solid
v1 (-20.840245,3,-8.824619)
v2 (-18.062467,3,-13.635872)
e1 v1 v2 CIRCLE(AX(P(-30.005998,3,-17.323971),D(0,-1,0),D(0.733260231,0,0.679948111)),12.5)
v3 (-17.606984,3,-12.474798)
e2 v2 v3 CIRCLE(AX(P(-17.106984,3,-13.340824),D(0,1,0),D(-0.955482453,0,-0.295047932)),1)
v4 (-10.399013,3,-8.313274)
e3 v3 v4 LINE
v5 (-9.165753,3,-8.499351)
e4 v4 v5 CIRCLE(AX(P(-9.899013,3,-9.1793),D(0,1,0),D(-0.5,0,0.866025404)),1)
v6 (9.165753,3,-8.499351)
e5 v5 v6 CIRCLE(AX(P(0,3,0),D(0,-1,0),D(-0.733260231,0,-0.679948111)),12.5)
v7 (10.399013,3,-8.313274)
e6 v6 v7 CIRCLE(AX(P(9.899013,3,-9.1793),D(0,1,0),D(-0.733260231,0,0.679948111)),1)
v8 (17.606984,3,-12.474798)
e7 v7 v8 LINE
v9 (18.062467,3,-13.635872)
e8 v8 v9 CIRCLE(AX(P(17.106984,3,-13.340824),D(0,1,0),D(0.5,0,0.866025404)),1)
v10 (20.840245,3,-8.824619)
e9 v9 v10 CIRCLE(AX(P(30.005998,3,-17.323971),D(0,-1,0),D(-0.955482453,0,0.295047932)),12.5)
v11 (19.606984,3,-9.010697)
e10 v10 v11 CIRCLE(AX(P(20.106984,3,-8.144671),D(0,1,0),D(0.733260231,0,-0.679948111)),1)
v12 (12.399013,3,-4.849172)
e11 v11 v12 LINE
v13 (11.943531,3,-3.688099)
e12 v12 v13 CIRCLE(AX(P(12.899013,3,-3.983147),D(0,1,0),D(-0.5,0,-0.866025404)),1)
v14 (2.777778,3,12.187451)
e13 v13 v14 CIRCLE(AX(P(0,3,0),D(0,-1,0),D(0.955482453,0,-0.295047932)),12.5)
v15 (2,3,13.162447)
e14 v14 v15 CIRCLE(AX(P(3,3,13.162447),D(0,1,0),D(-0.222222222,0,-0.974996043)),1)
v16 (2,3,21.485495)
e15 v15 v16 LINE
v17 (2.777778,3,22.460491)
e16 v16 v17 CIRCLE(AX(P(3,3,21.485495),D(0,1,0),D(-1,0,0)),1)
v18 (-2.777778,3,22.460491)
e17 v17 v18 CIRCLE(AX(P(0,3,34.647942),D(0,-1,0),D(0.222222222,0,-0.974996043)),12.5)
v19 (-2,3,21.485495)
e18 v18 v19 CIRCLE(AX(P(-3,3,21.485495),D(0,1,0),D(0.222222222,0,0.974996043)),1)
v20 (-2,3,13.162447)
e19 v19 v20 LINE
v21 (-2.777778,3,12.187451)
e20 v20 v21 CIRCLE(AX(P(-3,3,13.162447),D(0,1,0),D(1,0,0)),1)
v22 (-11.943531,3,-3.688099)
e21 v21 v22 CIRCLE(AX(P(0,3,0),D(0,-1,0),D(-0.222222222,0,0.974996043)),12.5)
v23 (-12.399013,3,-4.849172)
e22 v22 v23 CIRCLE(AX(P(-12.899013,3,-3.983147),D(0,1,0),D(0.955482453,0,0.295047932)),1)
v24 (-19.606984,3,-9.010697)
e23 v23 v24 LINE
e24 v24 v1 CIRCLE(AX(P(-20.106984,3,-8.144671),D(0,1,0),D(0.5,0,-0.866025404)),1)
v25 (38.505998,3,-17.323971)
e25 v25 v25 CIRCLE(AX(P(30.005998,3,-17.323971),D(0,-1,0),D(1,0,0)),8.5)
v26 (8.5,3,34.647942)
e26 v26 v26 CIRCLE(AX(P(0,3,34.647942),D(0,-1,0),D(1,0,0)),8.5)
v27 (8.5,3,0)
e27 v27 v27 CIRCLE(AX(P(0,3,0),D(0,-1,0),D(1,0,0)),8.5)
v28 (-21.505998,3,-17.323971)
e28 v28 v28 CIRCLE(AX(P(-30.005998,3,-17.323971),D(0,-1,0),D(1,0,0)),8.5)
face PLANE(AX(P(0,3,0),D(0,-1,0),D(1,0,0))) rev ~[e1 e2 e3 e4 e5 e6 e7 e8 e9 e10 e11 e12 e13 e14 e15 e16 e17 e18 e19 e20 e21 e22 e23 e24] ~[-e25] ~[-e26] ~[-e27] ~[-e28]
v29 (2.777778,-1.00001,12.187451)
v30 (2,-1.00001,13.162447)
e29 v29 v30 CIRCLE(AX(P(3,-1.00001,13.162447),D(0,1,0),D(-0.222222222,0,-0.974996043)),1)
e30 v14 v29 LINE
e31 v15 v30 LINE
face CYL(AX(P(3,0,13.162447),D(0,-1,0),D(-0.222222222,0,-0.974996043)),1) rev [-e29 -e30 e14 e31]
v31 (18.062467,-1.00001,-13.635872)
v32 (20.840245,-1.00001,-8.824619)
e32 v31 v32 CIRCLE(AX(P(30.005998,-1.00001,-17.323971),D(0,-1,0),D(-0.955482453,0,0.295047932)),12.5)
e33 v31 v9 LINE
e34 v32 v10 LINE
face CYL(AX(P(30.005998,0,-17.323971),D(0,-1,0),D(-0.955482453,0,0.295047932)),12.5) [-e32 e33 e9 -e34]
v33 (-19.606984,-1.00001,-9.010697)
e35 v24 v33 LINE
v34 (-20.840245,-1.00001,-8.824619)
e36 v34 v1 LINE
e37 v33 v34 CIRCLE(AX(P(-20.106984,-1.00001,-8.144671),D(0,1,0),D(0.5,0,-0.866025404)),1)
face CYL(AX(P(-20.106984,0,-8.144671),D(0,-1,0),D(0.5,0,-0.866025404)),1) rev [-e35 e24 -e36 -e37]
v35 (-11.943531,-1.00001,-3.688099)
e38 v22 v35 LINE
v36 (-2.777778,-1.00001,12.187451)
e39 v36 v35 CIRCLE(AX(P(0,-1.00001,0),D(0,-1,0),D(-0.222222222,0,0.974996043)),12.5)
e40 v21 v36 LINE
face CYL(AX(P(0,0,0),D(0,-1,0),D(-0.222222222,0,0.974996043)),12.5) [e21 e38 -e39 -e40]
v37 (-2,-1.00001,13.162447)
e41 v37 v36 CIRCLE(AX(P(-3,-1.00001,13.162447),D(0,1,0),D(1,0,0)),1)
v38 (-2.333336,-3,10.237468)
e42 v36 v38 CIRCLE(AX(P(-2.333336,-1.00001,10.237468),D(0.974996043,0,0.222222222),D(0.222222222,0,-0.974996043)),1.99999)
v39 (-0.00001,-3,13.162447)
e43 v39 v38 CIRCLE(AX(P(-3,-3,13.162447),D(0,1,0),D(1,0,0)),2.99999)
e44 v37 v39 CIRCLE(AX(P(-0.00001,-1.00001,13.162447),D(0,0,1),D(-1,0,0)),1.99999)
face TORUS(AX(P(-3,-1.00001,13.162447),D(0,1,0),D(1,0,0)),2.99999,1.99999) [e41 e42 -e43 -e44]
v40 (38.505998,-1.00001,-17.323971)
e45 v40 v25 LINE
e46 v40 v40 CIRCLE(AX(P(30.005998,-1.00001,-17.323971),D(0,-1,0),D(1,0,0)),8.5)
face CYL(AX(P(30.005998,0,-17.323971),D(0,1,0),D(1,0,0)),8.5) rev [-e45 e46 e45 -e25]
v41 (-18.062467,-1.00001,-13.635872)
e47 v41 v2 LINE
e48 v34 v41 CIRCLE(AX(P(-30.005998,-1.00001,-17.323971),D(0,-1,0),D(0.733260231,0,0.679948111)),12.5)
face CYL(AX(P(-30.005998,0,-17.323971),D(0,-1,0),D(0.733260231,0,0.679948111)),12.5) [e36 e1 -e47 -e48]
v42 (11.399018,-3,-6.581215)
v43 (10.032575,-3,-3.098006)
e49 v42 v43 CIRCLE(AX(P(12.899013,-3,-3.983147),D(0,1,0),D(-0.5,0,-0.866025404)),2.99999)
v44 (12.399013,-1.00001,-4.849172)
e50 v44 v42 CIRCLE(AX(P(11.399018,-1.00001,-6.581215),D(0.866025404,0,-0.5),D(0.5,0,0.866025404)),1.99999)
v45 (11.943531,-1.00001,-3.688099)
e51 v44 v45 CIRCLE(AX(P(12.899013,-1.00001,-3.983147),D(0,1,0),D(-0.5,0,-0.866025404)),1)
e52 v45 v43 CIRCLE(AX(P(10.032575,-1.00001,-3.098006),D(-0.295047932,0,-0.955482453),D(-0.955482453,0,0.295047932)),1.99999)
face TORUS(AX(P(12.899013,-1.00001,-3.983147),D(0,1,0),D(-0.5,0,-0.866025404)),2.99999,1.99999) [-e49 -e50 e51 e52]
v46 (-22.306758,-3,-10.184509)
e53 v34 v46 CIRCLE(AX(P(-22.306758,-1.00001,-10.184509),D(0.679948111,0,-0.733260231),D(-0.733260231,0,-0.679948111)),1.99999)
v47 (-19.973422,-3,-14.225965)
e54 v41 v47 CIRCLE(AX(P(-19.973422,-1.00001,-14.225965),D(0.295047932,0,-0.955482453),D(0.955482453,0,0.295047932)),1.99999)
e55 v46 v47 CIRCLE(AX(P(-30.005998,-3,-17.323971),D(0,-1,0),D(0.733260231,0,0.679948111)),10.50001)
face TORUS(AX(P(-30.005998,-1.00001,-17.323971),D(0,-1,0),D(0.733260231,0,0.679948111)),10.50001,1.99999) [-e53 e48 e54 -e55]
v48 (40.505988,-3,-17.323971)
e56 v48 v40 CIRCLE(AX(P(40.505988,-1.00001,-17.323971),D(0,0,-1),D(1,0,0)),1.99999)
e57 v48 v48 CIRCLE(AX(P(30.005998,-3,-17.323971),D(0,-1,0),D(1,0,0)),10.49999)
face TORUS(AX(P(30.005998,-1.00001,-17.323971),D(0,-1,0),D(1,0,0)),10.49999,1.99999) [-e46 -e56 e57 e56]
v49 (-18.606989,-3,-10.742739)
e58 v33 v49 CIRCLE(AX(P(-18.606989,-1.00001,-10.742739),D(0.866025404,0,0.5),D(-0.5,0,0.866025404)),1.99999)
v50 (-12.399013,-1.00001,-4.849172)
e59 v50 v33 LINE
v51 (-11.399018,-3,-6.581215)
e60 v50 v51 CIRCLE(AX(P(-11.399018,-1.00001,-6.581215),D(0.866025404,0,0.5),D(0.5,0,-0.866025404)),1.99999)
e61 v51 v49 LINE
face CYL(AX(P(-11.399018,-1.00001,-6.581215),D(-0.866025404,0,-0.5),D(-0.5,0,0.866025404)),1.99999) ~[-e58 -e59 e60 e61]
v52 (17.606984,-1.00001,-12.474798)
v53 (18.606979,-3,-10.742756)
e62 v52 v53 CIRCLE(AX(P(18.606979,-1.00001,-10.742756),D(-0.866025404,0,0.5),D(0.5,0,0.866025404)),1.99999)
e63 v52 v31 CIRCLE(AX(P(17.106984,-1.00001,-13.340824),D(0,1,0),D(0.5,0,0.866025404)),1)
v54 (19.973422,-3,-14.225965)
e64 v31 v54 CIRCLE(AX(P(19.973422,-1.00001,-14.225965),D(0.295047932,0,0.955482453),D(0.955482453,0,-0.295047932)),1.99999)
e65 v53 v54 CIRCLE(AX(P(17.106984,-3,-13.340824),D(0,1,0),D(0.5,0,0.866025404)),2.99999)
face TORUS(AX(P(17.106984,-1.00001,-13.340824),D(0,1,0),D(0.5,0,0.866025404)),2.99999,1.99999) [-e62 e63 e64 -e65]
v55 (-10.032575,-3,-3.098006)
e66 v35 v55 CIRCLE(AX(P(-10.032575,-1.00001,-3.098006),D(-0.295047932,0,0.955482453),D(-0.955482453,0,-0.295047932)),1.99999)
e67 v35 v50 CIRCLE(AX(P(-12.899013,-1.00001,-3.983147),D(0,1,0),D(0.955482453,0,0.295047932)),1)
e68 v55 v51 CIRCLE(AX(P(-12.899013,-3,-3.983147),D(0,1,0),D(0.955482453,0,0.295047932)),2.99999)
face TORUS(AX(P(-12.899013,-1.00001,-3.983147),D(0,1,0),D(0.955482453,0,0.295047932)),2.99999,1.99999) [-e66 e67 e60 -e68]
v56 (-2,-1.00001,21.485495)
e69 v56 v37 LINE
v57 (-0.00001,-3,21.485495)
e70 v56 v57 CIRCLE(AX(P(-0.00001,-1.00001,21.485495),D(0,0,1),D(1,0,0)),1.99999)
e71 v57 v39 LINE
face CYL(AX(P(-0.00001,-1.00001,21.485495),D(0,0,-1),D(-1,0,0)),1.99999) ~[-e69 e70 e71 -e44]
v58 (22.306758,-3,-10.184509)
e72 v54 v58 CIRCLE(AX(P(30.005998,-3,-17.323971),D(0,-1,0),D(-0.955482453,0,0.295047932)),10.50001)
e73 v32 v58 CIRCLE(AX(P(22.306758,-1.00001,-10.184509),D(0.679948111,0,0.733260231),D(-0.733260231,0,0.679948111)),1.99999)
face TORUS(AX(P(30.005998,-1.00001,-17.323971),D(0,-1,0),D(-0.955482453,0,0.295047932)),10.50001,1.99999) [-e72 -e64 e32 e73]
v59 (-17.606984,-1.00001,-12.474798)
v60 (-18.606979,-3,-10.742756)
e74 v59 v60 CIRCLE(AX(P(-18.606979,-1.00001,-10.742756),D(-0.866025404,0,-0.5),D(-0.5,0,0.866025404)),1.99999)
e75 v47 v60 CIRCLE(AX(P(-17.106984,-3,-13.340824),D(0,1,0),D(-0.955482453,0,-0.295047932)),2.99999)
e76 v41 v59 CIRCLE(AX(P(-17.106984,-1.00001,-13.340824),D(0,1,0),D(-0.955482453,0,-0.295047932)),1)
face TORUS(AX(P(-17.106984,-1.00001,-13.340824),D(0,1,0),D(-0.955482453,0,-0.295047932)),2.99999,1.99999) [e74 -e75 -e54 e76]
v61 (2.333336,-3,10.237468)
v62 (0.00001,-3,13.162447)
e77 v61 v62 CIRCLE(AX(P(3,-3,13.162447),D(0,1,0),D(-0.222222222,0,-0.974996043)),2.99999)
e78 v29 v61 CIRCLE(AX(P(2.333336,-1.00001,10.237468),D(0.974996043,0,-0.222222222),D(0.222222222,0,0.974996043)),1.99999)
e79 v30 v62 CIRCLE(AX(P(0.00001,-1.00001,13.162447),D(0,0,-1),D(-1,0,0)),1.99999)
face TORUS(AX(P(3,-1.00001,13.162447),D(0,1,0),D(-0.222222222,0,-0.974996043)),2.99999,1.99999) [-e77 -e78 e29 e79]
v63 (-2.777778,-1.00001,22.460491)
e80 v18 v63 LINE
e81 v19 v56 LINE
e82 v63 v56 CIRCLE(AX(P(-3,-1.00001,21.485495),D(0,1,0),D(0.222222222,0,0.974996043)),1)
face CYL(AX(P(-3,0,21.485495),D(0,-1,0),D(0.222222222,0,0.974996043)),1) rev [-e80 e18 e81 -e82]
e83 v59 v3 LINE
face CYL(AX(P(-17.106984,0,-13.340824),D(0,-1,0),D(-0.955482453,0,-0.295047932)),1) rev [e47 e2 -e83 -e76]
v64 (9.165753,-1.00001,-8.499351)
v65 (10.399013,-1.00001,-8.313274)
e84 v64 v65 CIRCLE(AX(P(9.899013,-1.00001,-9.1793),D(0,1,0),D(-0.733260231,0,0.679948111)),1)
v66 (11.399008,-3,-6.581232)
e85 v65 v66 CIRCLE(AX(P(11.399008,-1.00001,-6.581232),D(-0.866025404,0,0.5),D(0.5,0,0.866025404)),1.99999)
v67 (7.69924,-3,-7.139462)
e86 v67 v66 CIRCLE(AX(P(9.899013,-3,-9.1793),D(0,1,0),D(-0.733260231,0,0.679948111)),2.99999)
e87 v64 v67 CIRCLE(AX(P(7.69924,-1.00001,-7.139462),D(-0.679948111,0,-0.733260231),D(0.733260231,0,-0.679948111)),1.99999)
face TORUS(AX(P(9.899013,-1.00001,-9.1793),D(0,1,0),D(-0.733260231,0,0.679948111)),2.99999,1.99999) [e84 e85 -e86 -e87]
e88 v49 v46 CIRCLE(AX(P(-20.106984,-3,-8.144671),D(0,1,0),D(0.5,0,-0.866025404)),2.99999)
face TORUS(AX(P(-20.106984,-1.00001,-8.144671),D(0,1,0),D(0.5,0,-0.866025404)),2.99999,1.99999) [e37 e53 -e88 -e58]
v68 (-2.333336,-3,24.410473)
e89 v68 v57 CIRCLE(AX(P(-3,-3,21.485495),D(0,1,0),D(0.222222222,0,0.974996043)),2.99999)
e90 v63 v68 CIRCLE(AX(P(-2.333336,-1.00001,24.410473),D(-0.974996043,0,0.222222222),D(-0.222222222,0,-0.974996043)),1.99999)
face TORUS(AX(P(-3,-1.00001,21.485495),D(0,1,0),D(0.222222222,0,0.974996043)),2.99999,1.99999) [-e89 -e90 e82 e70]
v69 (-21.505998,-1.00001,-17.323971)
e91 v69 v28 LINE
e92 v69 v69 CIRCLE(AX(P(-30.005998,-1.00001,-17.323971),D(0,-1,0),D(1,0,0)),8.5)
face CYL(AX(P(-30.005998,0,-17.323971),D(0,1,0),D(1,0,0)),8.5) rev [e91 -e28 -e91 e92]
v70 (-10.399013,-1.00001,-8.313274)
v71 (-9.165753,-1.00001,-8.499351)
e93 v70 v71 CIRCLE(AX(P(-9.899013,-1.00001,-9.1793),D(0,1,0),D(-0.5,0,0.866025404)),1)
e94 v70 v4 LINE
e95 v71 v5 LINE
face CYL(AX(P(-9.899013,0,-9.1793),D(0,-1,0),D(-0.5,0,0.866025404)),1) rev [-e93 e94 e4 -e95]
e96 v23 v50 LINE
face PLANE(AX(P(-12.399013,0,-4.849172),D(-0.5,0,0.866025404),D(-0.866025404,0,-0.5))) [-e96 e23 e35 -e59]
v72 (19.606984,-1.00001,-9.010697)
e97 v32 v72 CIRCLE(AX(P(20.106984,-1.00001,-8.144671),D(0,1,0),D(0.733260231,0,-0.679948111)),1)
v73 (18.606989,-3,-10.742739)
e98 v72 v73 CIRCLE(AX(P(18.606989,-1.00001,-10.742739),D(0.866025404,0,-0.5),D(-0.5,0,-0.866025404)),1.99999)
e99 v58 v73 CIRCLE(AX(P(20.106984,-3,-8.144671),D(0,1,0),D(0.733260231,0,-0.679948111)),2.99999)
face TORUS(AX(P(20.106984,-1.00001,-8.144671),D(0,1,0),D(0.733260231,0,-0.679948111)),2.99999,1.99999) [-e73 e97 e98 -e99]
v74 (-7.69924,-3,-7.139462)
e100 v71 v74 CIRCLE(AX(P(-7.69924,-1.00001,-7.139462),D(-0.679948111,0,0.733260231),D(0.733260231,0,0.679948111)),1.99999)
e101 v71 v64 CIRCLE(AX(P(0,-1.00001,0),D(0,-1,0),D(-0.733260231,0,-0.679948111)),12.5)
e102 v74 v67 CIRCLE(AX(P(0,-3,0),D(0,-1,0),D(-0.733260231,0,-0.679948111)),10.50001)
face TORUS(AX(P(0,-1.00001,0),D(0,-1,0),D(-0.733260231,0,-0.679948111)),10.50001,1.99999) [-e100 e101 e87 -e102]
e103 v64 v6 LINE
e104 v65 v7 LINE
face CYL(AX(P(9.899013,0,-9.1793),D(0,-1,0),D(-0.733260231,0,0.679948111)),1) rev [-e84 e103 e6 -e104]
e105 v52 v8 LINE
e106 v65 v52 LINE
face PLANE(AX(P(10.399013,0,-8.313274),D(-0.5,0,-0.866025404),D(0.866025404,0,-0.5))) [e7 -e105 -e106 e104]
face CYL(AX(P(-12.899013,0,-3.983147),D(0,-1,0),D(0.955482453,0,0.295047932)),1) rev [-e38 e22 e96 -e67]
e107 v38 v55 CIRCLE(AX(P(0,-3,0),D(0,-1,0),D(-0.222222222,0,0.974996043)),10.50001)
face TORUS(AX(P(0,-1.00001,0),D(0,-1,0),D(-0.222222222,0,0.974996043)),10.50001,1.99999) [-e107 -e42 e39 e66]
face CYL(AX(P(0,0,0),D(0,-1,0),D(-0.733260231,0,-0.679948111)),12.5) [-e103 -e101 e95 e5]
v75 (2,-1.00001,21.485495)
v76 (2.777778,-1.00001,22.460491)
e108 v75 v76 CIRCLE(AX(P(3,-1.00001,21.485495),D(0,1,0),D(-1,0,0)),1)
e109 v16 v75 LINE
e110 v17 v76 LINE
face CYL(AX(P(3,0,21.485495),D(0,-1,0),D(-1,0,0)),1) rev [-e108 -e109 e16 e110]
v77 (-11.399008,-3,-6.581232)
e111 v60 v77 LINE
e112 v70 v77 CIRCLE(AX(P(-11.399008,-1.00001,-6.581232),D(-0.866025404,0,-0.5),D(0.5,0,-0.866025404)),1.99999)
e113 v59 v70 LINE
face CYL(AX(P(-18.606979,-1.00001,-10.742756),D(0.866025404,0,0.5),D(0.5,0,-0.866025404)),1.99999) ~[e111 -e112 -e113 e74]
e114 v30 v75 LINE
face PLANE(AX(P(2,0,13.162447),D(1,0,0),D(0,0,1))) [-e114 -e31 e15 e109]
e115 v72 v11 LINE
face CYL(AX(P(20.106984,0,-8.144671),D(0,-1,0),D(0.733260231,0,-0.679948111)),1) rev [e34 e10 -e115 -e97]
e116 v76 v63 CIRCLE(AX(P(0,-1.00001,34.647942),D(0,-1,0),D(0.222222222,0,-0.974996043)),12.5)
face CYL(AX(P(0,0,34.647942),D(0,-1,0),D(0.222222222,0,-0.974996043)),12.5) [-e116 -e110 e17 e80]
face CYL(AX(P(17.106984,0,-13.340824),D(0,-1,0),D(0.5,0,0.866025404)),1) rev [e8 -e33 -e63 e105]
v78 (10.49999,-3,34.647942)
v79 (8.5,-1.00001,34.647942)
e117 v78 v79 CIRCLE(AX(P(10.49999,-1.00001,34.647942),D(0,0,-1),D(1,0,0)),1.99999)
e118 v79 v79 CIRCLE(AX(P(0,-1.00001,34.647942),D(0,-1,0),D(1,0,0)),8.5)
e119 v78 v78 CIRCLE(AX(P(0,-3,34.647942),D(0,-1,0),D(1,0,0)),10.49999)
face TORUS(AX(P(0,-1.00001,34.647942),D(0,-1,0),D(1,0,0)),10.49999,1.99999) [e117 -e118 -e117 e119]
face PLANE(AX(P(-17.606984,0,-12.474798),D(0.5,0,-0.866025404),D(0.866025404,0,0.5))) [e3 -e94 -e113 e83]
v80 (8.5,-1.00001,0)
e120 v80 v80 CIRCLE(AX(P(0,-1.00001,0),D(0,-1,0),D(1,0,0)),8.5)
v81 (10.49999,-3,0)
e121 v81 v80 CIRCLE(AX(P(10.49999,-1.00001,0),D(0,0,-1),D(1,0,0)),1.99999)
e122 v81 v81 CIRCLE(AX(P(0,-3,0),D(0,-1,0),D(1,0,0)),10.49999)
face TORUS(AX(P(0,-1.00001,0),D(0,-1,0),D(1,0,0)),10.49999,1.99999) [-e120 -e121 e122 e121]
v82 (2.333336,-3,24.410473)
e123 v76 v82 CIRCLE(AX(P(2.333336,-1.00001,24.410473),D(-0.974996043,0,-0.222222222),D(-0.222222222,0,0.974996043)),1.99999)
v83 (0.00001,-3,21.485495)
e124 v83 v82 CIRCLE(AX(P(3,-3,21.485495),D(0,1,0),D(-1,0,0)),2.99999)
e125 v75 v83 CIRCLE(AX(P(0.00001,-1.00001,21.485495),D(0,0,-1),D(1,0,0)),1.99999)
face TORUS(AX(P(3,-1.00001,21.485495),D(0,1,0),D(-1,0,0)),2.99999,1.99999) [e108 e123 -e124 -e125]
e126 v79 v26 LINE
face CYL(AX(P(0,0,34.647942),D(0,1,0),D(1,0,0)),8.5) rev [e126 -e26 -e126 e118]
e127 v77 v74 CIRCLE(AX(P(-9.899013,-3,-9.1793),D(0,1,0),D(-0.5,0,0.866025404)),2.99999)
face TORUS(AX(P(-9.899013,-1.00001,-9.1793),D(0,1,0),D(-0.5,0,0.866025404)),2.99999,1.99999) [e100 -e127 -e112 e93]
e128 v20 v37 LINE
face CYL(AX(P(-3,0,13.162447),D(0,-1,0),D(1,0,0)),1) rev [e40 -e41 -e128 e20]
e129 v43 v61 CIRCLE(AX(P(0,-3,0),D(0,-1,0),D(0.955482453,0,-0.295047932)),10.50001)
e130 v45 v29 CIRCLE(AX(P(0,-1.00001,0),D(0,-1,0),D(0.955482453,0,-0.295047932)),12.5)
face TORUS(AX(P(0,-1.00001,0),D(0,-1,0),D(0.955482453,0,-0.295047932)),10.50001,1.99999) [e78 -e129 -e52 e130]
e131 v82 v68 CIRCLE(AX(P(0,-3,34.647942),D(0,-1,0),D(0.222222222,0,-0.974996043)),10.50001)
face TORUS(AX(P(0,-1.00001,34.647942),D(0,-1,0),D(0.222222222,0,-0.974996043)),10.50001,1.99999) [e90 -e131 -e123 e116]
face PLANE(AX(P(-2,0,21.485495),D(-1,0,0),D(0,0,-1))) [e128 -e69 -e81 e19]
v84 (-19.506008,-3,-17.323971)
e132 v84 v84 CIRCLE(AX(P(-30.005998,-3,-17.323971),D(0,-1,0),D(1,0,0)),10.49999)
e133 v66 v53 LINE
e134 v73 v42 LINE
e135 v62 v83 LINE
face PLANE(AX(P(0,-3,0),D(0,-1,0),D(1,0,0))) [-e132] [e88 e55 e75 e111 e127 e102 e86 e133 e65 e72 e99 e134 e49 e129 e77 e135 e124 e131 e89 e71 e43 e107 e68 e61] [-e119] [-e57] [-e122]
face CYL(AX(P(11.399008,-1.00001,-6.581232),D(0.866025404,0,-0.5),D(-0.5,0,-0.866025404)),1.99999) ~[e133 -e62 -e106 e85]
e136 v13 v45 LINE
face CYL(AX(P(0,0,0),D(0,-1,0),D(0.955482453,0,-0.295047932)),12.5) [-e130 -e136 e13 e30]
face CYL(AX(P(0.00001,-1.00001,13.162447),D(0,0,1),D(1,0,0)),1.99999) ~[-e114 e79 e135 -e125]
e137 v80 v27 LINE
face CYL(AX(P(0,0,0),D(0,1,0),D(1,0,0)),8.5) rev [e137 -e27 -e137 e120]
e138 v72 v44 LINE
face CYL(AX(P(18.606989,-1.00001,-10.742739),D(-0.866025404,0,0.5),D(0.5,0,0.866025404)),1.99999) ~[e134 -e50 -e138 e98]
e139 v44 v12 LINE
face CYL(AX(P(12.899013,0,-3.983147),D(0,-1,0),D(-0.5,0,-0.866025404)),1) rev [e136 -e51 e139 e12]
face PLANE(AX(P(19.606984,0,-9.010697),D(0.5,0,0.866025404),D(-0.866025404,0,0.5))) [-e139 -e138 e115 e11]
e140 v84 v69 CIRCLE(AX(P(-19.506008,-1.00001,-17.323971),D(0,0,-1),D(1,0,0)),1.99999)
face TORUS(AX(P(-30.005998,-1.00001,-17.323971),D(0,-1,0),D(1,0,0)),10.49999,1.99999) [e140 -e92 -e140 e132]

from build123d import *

# Parameters (mm, degrees)
F0_R     = 8.5
F1_DEPTH = 3
F2_R     = 1.99999


# Not quite as in the source:
# - a fillet or chamfer is up to 0.001 mm smaller than in the source, because OpenCascade refuses the exact size


with BuildPart() as f1:
    # F0 (on Front) → F1 (new body, symmetric)
    with BuildSketch(Plane.XZ):
        with BuildLine():
            ThreePointArc((12.3990131152, -4.849172483), (11.9680834103, -4.3483454973), (11.9435306622, -3.6880991474))
            ThreePointArc((11.9435306622, -3.6880991474), (10.8253175473, 6.25), (2.7777777778, 12.187450538))
            ThreePointArc((2.7777777778, 12.187450538), (2.21826404, 12.5388370166), (2, 13.1624465811))
            Line((2, 13.1624465811), (2, 21.4854950083))
            ThreePointArc((2, 21.4854950083), (2.21826404, 22.1091045727), (2.7777777778, 22.4604910513))
            ThreePointArc((2.7777777778, 22.4604910513), (0, 47.1479415894), (-2.7777777778, 22.4604910513))
            ThreePointArc((-2.7777777778, 22.4604910513), (-2.21826404, 22.1091045727), (-2, 21.4854950083))
            Line((-2, 21.4854950083), (-2, 13.1624465811))
            ThreePointArc((-2, 13.1624465811), (-2.21826404, 12.5388370166), (-2.7777777778, 12.187450538))
            ThreePointArc((-2.7777777778, 12.187450538), (-10.8253175473, 6.25), (-11.9435306622, -3.6880991474))
            ThreePointArc((-11.9435306622, -3.6880991474), (-11.9680834103, -4.3483454973), (-12.3990131152, -4.849172483))
            Line((-12.3990131152, -4.849172483), (-19.60698449, -9.0106966966))
            ThreePointArc((-19.60698449, -9.0106966966), (-20.2561782349, -9.1334792754), (-20.8402447208, -8.824619404))
            ThreePointArc((-20.8402447208, -8.824619404), (-40.8313151525, -23.5739707947), (-18.062466943, -13.6358716473))
            ThreePointArc((-18.062466943, -13.6358716473), (-18.0379141949, -12.9756252973), (-17.60698449, -12.4747983117))
            Line((-17.60698449, -12.4747983117), (-10.3990131152, -8.3132740981))
            ThreePointArc((-10.3990131152, -8.3132740981), (-9.7498193703, -8.1904915193), (-9.1657528844, -8.4993513906))
            ThreePointArc((-9.1657528844, -8.4993513906), (0, -12.5), (9.1657528844, -8.4993513906))
            ThreePointArc((9.1657528844, -8.4993513906), (9.7498193703, -8.1904915193), (10.3990131152, -8.3132740981))
            Line((10.3990131152, -8.3132740981), (17.60698449, -12.4747983117))
            ThreePointArc((17.60698449, -12.4747983117), (18.0379141949, -12.9756252973), (18.062466943, -13.6358716473))
            ThreePointArc((18.062466943, -13.6358716473), (40.8313151525, -23.5739707947), (20.8402447208, -8.824619404))
            ThreePointArc((20.8402447208, -8.824619404), (20.2561782349, -9.1334792754), (19.60698449, -9.0106966966))
            Line((19.60698449, -9.0106966966), (12.3990131152, -4.849172483))
        make_face()
        with Locations((-30.0059976052, -17.3239707947)):
            Circle(F0_R, mode=Mode.SUBTRACT)
        with Locations((30.0059976052, -17.3239707947)):
            Circle(F0_R, mode=Mode.SUBTRACT)
        Circle(F0_R, mode=Mode.SUBTRACT)
        with Locations((0, 34.6479415894)):
            Circle(F0_R, mode=Mode.SUBTRACT)
    extrude(amount=F1_DEPTH, both=True)

    # F2 (radius 2 in the source; OpenCascade refuses exactly that, so slightly less here)
    f2_edges = [f1.edges().sort_by_distance(p)[0] for p in [
        (18.037914, -3, -12.975625),
        (40.831315, -3, -23.573971),
        (20.256178, -3, -9.133479),
        (16.002999, -3, -6.929935),
        (11.968083, -3, -4.348345),
        (10.825318, -3, 6.25),
        (2.218264, -3, 12.538837),
        (2, -3, 17.323971),
        (2.218264, -3, 22.109105),
        (0, -3, 47.147942),
        (-2.218264, -3, 22.109105),
        (-2, -3, 17.323971),
        (-2.218264, -3, 12.538837),
        (-10.825318, -3, 6.25),
        (-11.968083, -3, -4.348345),
        (-16.002999, -3, -6.929935),
        (-20.256178, -3, -9.133479),
        (-40.831315, -3, -23.573971),
        (-18.037914, -3, -12.975625),
        (-14.002999, -3, -10.394036),
        (-9.749819, -3, -8.190492),
        (0, -3, -12.5),
        (9.749819, -3, -8.190492),
        (14.002999, -3, -10.394036),
        (-38.505998, -3, -17.323971),
        (21.505998, -3, -17.323971),
        (-8.5, -3, 0),
        (-8.5, -3, 34.647942),
    ]]
    fillet(f2_edges, radius=F2_R)


solid = f1.part
